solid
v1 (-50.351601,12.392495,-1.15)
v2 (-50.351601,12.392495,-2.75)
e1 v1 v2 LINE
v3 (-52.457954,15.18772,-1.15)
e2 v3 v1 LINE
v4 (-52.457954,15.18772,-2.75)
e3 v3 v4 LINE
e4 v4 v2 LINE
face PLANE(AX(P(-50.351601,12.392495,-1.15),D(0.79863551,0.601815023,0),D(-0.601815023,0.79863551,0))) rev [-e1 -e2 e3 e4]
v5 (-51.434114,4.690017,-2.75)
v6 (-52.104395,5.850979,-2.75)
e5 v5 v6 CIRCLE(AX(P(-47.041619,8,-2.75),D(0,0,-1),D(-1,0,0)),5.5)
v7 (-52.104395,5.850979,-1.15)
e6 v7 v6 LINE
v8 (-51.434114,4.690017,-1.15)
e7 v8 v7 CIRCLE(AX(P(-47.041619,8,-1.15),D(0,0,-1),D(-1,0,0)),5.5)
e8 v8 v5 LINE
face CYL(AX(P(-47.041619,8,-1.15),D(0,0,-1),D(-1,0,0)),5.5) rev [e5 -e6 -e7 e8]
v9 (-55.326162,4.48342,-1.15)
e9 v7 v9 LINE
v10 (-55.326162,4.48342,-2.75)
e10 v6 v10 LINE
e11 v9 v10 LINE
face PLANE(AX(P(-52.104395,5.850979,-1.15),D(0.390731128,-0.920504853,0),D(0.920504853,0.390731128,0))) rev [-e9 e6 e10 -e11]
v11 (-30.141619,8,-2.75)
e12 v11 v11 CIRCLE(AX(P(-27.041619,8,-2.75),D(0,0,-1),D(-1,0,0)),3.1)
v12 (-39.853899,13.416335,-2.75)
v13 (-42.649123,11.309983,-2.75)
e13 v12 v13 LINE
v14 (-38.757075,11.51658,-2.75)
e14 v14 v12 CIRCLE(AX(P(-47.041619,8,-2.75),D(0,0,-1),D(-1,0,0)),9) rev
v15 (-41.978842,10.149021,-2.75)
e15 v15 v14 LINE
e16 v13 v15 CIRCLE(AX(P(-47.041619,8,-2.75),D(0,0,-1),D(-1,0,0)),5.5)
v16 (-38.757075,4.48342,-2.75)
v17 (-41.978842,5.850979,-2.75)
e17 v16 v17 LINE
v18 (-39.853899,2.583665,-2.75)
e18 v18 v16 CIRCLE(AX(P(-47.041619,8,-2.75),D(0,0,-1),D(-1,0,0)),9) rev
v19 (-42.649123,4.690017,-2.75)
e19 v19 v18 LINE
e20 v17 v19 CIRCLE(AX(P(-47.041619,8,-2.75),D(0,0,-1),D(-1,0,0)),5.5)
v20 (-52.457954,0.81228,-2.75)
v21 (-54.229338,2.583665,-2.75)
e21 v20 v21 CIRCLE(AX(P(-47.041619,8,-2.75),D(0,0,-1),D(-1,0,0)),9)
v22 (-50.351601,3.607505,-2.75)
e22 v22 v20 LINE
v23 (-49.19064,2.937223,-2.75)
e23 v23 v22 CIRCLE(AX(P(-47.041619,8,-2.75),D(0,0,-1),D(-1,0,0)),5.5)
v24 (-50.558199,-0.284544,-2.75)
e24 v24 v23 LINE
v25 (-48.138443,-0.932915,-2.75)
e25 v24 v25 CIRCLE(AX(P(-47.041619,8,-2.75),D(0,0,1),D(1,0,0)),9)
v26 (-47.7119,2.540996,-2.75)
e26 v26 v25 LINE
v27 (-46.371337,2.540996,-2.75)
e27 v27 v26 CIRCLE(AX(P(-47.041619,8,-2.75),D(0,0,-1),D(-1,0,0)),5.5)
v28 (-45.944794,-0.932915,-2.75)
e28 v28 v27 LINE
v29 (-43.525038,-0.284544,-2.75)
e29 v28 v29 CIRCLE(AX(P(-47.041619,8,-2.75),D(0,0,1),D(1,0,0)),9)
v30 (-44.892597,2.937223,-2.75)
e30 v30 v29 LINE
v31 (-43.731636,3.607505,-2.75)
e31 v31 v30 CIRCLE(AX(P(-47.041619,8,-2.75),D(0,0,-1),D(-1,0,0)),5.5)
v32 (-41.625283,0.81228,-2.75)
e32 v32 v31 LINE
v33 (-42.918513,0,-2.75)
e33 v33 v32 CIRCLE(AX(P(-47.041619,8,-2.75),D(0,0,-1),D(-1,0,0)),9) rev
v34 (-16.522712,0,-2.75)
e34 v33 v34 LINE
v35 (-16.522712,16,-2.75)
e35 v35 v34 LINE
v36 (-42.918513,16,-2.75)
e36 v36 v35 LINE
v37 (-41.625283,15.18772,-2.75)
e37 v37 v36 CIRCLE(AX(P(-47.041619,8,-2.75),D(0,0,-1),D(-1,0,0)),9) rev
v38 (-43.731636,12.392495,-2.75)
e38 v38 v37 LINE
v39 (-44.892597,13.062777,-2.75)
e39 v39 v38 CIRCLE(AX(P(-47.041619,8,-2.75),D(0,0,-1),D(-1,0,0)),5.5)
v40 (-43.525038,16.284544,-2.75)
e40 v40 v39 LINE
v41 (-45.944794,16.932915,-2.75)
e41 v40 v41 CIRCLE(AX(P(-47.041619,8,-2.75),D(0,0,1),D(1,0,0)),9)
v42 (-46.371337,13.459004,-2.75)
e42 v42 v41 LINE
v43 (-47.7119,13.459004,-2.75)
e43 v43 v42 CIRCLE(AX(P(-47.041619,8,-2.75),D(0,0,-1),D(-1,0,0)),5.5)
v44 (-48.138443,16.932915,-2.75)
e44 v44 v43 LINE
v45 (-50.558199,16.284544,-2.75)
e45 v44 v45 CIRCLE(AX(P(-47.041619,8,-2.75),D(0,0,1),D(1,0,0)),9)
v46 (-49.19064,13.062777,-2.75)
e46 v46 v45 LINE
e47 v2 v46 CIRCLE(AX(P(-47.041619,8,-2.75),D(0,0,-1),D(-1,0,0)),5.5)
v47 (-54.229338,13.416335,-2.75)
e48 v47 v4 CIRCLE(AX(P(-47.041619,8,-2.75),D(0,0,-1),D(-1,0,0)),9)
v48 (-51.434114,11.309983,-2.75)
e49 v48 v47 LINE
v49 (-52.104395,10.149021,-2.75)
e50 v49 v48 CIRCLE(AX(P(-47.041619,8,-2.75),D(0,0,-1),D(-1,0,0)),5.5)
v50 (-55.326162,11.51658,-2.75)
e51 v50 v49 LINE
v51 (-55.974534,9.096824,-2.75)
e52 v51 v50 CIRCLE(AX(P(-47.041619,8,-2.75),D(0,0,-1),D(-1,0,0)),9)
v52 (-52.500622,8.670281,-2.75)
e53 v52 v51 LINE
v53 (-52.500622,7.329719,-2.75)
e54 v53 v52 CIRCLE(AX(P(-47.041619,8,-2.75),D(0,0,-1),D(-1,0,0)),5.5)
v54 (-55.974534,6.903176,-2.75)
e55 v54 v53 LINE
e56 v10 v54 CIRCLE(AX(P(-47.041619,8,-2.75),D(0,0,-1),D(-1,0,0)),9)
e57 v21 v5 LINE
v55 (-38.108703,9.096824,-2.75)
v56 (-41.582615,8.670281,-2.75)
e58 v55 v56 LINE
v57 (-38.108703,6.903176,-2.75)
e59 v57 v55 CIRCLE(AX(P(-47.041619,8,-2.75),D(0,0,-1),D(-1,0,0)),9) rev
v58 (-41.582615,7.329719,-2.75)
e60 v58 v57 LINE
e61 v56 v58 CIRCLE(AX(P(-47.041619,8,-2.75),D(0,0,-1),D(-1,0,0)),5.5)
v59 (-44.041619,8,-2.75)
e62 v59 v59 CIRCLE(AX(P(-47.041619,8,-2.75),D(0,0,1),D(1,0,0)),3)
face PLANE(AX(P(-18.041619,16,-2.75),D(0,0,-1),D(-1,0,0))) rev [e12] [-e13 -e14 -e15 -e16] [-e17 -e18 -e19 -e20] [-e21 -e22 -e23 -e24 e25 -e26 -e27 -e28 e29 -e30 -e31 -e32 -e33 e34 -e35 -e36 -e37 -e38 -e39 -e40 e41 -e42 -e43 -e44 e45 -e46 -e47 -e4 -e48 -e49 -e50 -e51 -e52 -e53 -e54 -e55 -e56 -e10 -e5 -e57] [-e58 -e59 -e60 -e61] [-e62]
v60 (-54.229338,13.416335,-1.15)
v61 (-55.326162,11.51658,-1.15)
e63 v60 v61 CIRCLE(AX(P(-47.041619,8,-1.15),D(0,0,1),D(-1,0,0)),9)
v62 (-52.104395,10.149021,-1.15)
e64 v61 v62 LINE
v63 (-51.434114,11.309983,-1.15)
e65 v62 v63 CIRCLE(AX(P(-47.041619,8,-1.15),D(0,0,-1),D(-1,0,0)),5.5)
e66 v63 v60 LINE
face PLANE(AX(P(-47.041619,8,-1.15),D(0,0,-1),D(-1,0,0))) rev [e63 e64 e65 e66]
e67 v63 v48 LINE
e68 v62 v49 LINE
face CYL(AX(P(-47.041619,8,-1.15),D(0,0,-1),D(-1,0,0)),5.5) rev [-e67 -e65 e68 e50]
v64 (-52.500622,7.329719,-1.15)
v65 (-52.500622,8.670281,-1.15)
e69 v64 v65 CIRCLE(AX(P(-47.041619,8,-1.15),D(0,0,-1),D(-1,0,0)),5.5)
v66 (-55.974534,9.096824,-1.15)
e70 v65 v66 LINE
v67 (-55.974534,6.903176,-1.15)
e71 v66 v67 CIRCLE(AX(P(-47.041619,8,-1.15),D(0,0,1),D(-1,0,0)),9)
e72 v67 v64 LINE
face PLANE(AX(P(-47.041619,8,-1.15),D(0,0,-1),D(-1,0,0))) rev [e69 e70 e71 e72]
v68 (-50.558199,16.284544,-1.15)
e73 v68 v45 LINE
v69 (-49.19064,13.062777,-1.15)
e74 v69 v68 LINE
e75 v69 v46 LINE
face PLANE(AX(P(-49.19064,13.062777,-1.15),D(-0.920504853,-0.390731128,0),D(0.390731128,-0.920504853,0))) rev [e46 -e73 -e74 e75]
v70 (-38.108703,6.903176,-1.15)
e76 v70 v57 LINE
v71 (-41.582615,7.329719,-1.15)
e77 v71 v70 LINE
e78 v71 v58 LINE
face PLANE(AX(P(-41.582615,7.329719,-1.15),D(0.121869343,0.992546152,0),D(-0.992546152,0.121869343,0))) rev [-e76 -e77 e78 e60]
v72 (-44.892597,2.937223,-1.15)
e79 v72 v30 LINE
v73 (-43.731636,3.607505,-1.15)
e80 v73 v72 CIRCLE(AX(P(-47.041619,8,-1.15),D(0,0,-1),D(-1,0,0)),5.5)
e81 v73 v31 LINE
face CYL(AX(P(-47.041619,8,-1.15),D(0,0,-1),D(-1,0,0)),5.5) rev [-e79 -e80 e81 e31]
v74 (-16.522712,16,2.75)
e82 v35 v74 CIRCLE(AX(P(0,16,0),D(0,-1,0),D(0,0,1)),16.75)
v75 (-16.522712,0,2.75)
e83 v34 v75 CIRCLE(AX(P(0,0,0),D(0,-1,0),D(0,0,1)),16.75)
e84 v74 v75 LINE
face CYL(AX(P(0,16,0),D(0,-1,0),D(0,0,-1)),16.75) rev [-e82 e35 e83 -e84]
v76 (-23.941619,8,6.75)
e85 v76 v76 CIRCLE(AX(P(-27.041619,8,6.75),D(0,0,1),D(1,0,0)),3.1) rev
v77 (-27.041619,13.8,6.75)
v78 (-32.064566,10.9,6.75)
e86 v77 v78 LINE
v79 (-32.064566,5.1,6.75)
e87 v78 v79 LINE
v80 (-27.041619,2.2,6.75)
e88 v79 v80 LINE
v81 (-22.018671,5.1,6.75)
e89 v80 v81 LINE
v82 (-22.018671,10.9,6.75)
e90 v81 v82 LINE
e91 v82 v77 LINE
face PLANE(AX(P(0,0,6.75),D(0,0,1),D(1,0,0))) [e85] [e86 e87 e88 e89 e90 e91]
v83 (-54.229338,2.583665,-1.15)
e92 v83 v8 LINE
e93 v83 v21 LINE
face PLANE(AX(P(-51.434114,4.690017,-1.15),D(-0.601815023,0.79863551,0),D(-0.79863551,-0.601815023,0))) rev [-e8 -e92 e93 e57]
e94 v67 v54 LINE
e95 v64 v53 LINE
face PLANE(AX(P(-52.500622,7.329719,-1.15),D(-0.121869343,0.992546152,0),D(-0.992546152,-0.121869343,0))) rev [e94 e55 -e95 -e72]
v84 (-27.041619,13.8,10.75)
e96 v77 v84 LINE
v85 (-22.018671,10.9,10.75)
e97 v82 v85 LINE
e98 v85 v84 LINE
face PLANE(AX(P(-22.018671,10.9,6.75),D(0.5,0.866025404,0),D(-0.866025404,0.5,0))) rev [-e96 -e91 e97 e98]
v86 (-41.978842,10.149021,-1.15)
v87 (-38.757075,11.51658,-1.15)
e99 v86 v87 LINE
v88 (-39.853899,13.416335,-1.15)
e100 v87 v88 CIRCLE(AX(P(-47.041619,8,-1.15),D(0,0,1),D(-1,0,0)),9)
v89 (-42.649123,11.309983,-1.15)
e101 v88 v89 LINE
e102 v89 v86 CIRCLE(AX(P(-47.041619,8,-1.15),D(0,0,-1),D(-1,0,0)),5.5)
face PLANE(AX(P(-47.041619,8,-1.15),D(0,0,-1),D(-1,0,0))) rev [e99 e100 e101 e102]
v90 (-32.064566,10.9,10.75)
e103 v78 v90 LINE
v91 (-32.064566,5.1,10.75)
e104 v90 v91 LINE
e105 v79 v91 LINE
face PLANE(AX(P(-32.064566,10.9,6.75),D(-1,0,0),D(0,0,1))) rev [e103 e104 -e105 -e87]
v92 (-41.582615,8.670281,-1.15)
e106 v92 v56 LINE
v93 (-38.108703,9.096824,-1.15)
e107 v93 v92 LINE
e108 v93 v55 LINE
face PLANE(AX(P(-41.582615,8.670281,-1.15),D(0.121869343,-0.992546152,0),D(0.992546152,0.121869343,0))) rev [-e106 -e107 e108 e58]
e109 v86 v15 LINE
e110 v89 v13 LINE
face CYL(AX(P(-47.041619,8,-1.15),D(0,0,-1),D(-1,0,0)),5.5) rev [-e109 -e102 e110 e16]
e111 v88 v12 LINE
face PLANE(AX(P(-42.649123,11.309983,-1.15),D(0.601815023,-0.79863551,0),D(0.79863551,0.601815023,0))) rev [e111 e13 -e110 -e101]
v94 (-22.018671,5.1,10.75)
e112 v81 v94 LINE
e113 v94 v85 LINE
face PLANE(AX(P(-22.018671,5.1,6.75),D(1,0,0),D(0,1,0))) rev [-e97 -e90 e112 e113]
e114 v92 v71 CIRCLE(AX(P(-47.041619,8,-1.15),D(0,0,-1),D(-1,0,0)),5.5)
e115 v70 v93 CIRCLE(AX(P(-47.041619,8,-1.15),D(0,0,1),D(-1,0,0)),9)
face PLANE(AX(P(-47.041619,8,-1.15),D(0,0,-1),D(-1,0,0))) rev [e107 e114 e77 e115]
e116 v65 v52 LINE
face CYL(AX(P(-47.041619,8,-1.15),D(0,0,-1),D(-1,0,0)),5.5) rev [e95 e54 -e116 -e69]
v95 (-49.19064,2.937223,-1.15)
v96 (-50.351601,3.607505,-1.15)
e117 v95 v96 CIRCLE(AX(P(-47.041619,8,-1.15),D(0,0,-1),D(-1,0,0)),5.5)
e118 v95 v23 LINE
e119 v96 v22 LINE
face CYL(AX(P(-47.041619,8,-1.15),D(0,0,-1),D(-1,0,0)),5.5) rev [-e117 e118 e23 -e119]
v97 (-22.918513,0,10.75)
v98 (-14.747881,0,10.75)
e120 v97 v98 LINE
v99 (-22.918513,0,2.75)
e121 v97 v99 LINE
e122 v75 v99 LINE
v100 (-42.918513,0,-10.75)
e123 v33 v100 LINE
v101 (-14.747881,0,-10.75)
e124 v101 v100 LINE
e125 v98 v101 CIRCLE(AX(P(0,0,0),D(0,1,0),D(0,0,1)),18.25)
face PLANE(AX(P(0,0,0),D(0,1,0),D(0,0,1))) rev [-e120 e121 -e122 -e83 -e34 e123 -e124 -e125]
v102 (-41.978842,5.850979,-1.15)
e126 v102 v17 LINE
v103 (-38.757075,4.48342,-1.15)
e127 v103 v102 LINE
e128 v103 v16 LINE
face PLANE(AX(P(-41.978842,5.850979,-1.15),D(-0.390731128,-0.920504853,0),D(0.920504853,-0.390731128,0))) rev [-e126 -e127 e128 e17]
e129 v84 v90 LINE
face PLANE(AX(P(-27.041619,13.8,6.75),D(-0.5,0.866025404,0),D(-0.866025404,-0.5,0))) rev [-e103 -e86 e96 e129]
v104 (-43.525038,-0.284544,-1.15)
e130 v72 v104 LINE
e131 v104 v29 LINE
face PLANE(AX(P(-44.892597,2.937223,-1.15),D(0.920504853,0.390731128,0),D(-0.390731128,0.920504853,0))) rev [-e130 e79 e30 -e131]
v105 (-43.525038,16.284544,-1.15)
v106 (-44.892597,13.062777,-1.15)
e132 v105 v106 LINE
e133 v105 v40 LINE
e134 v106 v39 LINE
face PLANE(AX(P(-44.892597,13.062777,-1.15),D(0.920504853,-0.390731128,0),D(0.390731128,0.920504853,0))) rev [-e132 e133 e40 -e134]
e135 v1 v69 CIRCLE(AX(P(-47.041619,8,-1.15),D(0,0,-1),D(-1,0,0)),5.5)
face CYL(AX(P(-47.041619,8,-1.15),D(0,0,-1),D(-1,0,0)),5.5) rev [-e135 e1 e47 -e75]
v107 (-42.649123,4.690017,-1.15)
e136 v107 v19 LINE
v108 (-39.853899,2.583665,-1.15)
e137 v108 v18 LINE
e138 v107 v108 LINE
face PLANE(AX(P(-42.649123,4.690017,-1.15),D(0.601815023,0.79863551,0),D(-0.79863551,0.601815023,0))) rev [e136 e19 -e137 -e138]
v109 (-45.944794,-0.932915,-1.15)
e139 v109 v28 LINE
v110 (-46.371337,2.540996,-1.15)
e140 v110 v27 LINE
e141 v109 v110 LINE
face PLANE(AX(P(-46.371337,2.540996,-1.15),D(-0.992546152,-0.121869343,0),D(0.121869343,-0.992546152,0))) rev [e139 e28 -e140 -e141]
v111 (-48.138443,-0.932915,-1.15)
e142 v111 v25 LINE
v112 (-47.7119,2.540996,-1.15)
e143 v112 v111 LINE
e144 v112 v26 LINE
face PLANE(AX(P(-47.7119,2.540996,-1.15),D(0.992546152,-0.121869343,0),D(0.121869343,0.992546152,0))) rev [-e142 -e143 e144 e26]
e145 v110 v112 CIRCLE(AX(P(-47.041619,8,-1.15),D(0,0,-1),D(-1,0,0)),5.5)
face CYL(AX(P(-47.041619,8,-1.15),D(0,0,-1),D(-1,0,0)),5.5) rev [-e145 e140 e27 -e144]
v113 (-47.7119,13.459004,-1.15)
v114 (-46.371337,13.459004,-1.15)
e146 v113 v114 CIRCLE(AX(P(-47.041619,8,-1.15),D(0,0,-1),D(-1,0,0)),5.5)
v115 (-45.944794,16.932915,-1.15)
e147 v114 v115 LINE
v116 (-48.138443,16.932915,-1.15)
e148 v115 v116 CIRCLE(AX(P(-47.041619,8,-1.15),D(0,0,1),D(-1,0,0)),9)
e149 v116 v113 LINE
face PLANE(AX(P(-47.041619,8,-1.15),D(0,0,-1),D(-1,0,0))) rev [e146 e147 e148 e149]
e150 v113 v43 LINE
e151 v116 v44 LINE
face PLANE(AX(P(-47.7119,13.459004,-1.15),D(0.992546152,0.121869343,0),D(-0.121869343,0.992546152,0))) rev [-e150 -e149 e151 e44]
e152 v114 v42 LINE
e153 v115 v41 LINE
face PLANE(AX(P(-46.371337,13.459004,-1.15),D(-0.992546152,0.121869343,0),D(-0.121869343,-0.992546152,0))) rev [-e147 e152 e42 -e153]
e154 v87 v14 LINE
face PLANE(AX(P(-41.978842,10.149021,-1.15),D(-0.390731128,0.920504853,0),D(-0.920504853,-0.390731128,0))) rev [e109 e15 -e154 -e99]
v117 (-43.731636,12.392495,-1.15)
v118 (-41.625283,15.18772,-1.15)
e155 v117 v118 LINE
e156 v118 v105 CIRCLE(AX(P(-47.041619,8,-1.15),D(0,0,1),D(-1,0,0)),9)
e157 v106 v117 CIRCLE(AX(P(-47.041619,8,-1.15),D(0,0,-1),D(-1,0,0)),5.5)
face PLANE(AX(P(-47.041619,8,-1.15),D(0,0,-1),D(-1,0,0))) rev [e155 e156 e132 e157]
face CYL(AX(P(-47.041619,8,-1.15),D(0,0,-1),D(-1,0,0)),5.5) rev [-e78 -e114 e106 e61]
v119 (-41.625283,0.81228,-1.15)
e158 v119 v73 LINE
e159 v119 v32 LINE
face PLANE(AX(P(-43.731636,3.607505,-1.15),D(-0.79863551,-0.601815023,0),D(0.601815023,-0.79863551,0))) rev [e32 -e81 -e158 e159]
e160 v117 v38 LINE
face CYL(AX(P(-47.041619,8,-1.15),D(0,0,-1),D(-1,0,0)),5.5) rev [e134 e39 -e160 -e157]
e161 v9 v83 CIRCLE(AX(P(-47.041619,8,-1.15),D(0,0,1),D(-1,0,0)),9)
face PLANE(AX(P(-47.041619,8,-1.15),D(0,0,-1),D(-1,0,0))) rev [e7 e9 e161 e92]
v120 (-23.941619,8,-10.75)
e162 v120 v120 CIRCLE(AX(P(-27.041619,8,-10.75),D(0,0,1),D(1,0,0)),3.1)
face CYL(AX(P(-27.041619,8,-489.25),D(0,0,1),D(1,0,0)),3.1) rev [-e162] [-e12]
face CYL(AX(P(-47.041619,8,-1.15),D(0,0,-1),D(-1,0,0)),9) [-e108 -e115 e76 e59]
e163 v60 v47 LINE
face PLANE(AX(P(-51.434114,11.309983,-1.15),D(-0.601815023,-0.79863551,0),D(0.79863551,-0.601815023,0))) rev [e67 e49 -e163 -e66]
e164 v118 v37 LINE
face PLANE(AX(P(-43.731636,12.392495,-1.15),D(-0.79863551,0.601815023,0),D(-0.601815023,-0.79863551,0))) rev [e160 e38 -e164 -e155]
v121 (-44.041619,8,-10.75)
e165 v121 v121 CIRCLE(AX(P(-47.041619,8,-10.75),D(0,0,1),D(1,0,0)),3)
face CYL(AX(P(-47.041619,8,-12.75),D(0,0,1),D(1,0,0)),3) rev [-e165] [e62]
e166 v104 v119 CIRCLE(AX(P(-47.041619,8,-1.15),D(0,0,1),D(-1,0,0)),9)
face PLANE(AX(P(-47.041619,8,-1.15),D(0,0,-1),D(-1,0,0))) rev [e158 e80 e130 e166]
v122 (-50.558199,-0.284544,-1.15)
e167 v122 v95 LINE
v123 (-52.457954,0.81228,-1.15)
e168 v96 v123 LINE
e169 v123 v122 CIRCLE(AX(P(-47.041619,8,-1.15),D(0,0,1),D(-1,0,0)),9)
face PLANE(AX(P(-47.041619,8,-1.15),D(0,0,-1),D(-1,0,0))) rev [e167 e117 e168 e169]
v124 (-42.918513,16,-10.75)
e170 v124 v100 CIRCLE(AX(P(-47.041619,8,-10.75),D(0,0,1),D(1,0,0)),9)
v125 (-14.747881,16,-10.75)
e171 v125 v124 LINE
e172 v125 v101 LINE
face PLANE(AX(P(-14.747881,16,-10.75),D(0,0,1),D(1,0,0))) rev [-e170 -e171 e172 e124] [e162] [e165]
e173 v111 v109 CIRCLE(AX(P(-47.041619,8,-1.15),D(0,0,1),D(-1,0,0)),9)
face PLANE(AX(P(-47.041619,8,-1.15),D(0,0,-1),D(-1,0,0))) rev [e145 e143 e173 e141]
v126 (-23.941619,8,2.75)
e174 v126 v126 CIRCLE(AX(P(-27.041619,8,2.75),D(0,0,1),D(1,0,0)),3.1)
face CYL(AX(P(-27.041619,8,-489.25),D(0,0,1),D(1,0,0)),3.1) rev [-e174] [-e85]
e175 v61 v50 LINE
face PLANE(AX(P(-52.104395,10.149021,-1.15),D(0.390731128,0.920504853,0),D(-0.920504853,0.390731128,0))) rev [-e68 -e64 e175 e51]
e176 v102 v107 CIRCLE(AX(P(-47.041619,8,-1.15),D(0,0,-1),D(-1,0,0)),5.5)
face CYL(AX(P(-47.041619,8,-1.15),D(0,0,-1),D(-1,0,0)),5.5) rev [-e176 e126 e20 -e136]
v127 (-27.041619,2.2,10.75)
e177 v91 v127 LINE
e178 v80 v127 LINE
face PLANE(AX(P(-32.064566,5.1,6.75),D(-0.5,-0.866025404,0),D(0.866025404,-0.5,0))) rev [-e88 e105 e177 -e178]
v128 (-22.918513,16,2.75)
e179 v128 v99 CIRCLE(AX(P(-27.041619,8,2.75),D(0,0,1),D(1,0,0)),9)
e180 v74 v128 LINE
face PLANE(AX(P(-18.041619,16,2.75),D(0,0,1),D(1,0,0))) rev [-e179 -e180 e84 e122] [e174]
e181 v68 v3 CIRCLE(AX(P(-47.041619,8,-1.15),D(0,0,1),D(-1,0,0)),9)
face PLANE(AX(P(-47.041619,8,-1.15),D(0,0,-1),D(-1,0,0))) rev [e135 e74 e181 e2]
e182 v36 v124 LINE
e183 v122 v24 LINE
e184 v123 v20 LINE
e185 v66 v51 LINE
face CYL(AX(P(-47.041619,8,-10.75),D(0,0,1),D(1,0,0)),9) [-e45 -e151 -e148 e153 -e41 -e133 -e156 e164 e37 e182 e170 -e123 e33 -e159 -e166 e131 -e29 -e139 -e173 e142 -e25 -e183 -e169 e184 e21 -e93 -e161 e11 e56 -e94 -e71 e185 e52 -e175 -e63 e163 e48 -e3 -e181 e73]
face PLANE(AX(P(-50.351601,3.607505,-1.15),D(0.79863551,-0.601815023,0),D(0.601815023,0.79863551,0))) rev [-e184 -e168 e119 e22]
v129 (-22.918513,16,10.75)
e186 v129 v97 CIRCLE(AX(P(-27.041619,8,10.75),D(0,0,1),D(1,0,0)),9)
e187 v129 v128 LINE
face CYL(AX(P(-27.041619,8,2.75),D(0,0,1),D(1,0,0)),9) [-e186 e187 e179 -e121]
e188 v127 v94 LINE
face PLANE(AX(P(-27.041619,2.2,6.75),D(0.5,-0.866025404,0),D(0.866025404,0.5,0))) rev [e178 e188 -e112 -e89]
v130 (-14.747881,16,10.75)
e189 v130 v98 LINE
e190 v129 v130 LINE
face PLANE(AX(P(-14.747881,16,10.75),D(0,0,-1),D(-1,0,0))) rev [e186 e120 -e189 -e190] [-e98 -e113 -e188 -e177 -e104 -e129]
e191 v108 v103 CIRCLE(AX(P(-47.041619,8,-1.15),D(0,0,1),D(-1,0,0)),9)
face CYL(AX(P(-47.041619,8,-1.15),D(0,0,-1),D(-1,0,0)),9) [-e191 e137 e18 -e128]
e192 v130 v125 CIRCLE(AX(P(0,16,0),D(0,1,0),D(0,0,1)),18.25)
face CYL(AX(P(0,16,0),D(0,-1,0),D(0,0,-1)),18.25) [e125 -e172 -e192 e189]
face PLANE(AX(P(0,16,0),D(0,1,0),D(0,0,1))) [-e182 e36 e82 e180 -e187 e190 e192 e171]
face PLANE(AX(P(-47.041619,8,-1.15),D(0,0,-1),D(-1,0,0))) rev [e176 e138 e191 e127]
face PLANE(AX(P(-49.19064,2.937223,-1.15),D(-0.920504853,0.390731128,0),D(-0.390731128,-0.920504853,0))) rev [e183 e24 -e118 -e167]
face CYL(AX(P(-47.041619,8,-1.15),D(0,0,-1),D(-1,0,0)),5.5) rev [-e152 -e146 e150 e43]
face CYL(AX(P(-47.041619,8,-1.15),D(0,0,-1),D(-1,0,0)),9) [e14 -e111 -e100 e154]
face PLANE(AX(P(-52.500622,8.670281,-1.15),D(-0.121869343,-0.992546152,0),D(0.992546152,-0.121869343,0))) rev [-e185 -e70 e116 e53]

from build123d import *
from build123d.topology import SkipClean

# Parameters (mm, degrees)
SALIENTE_EXTRUIR1_DEPTH = 16
CROQUIS2_R              = 3.1
CORTAR_EXTRUIR1_DEPTH   = 500
CROQUIS3_R              = 9
CROQUIS3_R_2            = 3.1
SALIENTE_EXTRUIR2_DEPTH = 8
CORTAR_EXTRUIR2_DEPTH   = 4
CROQUIS7_R              = 9
SALIENTE_EXTRUIR3_DEPTH = 8
SALIENTE_EXTRUIR4_DEPTH = 1.6
CROQUIS9_R              = 3
CORTAR_EXTRUIR3_DEPTH   = 10
CORTAR_EXTRUIR4_START   = -8
CORTAR_EXTRUIR4_DEPTH   = 8
CORTAR_EXTRUIR6_START   = -8
CORTAR_EXTRUIR6_DEPTH   = 8


# Read off the part's stored shape, not the designer's step: Cortar-Extruir4, Cortar-Extruir6
with BuildPart() as part:
    # Croquis1 → Saliente-Extruir1 (new body)
    with BuildSketch(Plane(origin=(0, 0, 0), x_dir=(1, 0, 0), z_dir=(0, 1, 0))):
        with BuildLine():
            Line((-18.041618553, 2.75), (-56.041618553, 2.75))
            Line((-56.041618553, 2.75), (-56.041618553, 10.75))
            Line((-56.041618553, 10.75), (-14.747881204, 10.75))
            ThreePointArc((-14.747881204, 10.75), (18.25, 0), (-14.747881204, -10.75))
            Line((-14.747881204, -10.75), (-36.041618553, -10.75))
            Line((-36.041618553, -10.75), (-36.041618553, -2.75))
            Line((-36.041618553, -2.75), (-18.041618553, -2.75))
            Line((-18.041618553, -2.75), (-16.522711642, -2.75))
            ThreePointArc((-16.522711642, -2.75), (16.75, 0), (-16.522711642, 2.75))
            Line((-16.522711642, 2.75), (-18.041618553, 2.75))
        make_face()
    extrude(amount=SALIENTE_EXTRUIR1_DEPTH)

    # Croquis2 → Cortar-Extruir1 (cut)
    with BuildSketch(Plane.XY.offset(10.75)):
        with Locations((-27.041618553, 8)):
            Circle(CROQUIS2_R)
    extrude(amount=-CORTAR_EXTRUIR1_DEPTH, mode=Mode.SUBTRACT)

    # Croquis3 → Saliente-Extruir2 (add)
    with BuildSketch(Plane.XY.offset(10.75)):
        with Locations((-27.041618553, 8)):
            Circle(CROQUIS3_R)
        with Locations((-27.041618553, 8)):
            Circle(CROQUIS3_R_2, mode=Mode.SUBTRACT)
    extrude(amount=-SALIENTE_EXTRUIR2_DEPTH)

    # Croquis5 → Cortar-Extruir2 (cut)
    with BuildSketch(Plane.XY.offset(10.75)):
        Polygon((-27.041618553, 2.2), (-22.018671211, 5.1), (-22.018671211, 10.9), (-27.041618553, 13.8), (-32.064565895, 10.9), (-32.064565895, 5.1), align=None)
    extrude(amount=-CORTAR_EXTRUIR2_DEPTH, mode=Mode.SUBTRACT)

    # Croquis7 → Saliente-Extruir3 (add)
    with BuildSketch(Plane.XY.offset(-2.75)):
        with Locations((-47.041618553, 8)):
            Circle(CROQUIS7_R)
    extrude(amount=-SALIENTE_EXTRUIR3_DEPTH)

    # Croquis8 → Saliente-Extruir4 (add, symmetric)
    with SkipClean():  # the faces are left unmerged after this step: merging them gives an invalid solid
        with BuildSketch(Plane.XY.offset(-2.75)):
            with BuildLine():
                Line((-47.711899941, 13.459003834), (-48.138442643, 16.932915365))
                ThreePointArc((-48.138442643, 16.932915365), (-47.041618553, 17), (-45.944794462, 16.932915365))
                Line((-45.944794462, 16.932915365), (-46.371337164, 13.459003834))
                ThreePointArc((-46.371337164, 13.459003834), (-47.041618553, 13.5), (-47.711899941, 13.459003834))
            make_face()
            with BuildLine():
                Line((-43.731635925, 12.392495305), (-41.625283344, 15.18771959))
                ThreePointArc((-41.625283344, 15.18771959), (-42.541618553, 15.794228634), (-43.525038396, 16.284543681))
                Line((-43.525038396, 16.284543681), (-44.892597346, 13.062776694))
                ThreePointArc((-44.892597346, 13.062776694), (-44.291618553, 12.763139721), (-43.731635925, 12.392495305))
            make_face()
            with BuildLine():
                Line((-41.978841859, 10.149021207), (-38.757074872, 11.516580156))
                ThreePointArc((-38.757074872, 11.516580156), (-39.247389919, 12.5), (-39.853898962, 13.416335208))
                Line((-39.853898962, 13.416335208), (-42.649123247, 11.309982627))
                ThreePointArc((-42.649123247, 11.309982627), (-42.278478832, 10.75), (-41.978841859, 10.149021207))
            make_face()
            with BuildLine():
                Line((-41.582614719, 7.329718611), (-38.108703188, 6.903175909))
                ThreePointArc((-38.108703188, 6.903175909), (-38.041618553, 8), (-38.108703188, 9.096824091))
                Line((-38.108703188, 9.096824091), (-41.582614719, 8.670281389))
                ThreePointArc((-41.582614719, 8.670281389), (-41.541618553, 8), (-41.582614719, 7.329718611))
            make_face()
            with BuildLine():
                Line((-42.649123247, 4.690017373), (-39.853898962, 2.583664792))
                ThreePointArc((-39.853898962, 2.583664792), (-39.247389919, 3.5), (-38.757074872, 4.483419844))
                Line((-38.757074872, 4.483419844), (-41.978841859, 5.850978793))
                ThreePointArc((-41.978841859, 5.850978793), (-42.278478832, 5.25), (-42.649123247, 4.690017373))
            make_face()
            with BuildLine():
                Line((-44.892597346, 2.937223306), (-43.525038396, -0.284543681))
                ThreePointArc((-43.525038396, -0.284543681), (-42.541618553, 0.205771366), (-41.625283344, 0.81228041))
                Line((-41.625283344, 0.81228041), (-43.731635925, 3.607504695))
                ThreePointArc((-43.731635925, 3.607504695), (-44.291618553, 3.236860279), (-44.892597346, 2.937223306))
            make_face()
            with BuildLine():
                Line((-47.711899941, 2.540996166), (-48.138442643, -0.932915365))
                ThreePointArc((-48.138442643, -0.932915365), (-47.041618553, -1), (-45.944794462, -0.932915365))
                Line((-45.944794462, -0.932915365), (-46.371337164, 2.540996166))
                ThreePointArc((-46.371337164, 2.540996166), (-47.041618553, 2.5), (-47.711899941, 2.540996166))
            make_face()
            with BuildLine():
                Line((-50.35160118, 3.607504695), (-52.457953761, 0.81228041))
                ThreePointArc((-52.457953761, 0.81228041), (-51.541618553, 0.205771366), (-50.558198709, -0.284543681))
                Line((-50.558198709, -0.284543681), (-49.190639759, 2.937223306))
                ThreePointArc((-49.190639759, 2.937223306), (-49.791618553, 3.236860279), (-50.35160118, 3.607504695))
            make_face()
            with BuildLine():
                Line((-52.104395247, 5.850978793), (-55.326162234, 4.483419844))
                ThreePointArc((-55.326162234, 4.483419844), (-54.835847187, 3.5), (-54.229338143, 2.583664792))
                Line((-54.229338143, 2.583664792), (-51.434113858, 4.690017373))
                ThreePointArc((-51.434113858, 4.690017373), (-51.804758273, 5.25), (-52.104395247, 5.850978793))
            make_face()
            with BuildLine():
                Line((-52.500622387, 8.670281389), (-55.974533917, 9.096824091))
                ThreePointArc((-55.974533917, 9.096824091), (-56.041618553, 8), (-55.974533917, 6.903175909))
                Line((-55.974533917, 6.903175909), (-52.500622387, 7.329718611))
                ThreePointArc((-52.500622387, 7.329718611), (-52.541618553, 8), (-52.500622387, 8.670281389))
            make_face()
            with BuildLine():
                Line((-51.434113858, 11.309982627), (-54.229338143, 13.416335208))
                ThreePointArc((-54.229338143, 13.416335208), (-54.835847187, 12.5), (-55.326162234, 11.516580156))
                Line((-55.326162234, 11.516580156), (-52.104395247, 10.149021207))
                ThreePointArc((-52.104395247, 10.149021207), (-51.804758273, 10.75), (-51.434113858, 11.309982627))
            make_face()
            with BuildLine():
                Line((-49.190639759, 13.062776694), (-50.558198709, 16.284543681))
                ThreePointArc((-50.558198709, 16.284543681), (-51.541618553, 15.794228634), (-52.457953761, 15.18771959))
                Line((-52.457953761, 15.18771959), (-50.35160118, 12.392495305))
                ThreePointArc((-50.35160118, 12.392495305), (-49.791618553, 12.763139721), (-49.190639759, 13.062776694))
            make_face()
        extrude(amount=SALIENTE_EXTRUIR4_DEPTH, both=True)

    # Croquis9 → Cortar-Extruir3 (cut)
    with SkipClean():  # the faces are left unmerged after this step: merging them gives an invalid solid
        with BuildSketch(Plane.XY.offset(-2.75)):
            with Locations((-47.041618553, 8)):
                Circle(CROQUIS9_R)
        extrude(amount=-CORTAR_EXTRUIR3_DEPTH, mode=Mode.SUBTRACT)

    # Cortar-Extruir4 outline → Cortar-Extruir4 (cut)
    with SkipClean():  # the faces are left unmerged after this step: merging them gives an invalid solid
        with BuildSketch(Plane(origin=(0, 0, -10.75), x_dir=(-1, 0, 0), z_dir=(0, 0, -1)).offset(CORTAR_EXTRUIR4_START)):
            with BuildLine():
                Line((56.041618553, 16), (51.164724178, 16))
                ThreePointArc((51.164724178, 16), (54.726276991, 12.684658439), (56.041618553, 8))
                Line((56.041618553, 8), (56.041618553, 16))
            make_face()
            with BuildLine():
                Line((56.041618553, 0), (56.041618553, 8))
                ThreePointArc((56.041618553, 8), (54.726276991, 3.315341561), (51.164724178, 0))
                Line((51.164724178, 0), (56.041618553, 0))
            make_face()
        extrude(amount=CORTAR_EXTRUIR4_DEPTH, mode=Mode.SUBTRACT)

    # Cortar-Extruir6 outline → Cortar-Extruir6 (cut)
    with SkipClean():  # the faces are left unmerged after this step: merging them gives an invalid solid
        with BuildSketch(Plane.XY.offset(10.75).offset(CORTAR_EXTRUIR6_START)):
            with BuildLine():
                ThreePointArc((-31.164724178, 0), (-34.726276991, 3.315341561), (-36.041618553, 8))
                Line((-36.041618553, 8), (-36.041618553, 0))
                Line((-36.041618553, 0), (-31.164724178, 0))
            make_face()
            with BuildLine():
                ThreePointArc((-36.041618553, 8), (-34.726276991, 12.684658439), (-31.164724178, 16))
                Line((-31.164724178, 16), (-36.041618553, 16))
                Line((-36.041618553, 16), (-36.041618553, 8))
            make_face()
        extrude(amount=CORTAR_EXTRUIR6_DEPTH, mode=Mode.SUBTRACT)


solid = part.part
